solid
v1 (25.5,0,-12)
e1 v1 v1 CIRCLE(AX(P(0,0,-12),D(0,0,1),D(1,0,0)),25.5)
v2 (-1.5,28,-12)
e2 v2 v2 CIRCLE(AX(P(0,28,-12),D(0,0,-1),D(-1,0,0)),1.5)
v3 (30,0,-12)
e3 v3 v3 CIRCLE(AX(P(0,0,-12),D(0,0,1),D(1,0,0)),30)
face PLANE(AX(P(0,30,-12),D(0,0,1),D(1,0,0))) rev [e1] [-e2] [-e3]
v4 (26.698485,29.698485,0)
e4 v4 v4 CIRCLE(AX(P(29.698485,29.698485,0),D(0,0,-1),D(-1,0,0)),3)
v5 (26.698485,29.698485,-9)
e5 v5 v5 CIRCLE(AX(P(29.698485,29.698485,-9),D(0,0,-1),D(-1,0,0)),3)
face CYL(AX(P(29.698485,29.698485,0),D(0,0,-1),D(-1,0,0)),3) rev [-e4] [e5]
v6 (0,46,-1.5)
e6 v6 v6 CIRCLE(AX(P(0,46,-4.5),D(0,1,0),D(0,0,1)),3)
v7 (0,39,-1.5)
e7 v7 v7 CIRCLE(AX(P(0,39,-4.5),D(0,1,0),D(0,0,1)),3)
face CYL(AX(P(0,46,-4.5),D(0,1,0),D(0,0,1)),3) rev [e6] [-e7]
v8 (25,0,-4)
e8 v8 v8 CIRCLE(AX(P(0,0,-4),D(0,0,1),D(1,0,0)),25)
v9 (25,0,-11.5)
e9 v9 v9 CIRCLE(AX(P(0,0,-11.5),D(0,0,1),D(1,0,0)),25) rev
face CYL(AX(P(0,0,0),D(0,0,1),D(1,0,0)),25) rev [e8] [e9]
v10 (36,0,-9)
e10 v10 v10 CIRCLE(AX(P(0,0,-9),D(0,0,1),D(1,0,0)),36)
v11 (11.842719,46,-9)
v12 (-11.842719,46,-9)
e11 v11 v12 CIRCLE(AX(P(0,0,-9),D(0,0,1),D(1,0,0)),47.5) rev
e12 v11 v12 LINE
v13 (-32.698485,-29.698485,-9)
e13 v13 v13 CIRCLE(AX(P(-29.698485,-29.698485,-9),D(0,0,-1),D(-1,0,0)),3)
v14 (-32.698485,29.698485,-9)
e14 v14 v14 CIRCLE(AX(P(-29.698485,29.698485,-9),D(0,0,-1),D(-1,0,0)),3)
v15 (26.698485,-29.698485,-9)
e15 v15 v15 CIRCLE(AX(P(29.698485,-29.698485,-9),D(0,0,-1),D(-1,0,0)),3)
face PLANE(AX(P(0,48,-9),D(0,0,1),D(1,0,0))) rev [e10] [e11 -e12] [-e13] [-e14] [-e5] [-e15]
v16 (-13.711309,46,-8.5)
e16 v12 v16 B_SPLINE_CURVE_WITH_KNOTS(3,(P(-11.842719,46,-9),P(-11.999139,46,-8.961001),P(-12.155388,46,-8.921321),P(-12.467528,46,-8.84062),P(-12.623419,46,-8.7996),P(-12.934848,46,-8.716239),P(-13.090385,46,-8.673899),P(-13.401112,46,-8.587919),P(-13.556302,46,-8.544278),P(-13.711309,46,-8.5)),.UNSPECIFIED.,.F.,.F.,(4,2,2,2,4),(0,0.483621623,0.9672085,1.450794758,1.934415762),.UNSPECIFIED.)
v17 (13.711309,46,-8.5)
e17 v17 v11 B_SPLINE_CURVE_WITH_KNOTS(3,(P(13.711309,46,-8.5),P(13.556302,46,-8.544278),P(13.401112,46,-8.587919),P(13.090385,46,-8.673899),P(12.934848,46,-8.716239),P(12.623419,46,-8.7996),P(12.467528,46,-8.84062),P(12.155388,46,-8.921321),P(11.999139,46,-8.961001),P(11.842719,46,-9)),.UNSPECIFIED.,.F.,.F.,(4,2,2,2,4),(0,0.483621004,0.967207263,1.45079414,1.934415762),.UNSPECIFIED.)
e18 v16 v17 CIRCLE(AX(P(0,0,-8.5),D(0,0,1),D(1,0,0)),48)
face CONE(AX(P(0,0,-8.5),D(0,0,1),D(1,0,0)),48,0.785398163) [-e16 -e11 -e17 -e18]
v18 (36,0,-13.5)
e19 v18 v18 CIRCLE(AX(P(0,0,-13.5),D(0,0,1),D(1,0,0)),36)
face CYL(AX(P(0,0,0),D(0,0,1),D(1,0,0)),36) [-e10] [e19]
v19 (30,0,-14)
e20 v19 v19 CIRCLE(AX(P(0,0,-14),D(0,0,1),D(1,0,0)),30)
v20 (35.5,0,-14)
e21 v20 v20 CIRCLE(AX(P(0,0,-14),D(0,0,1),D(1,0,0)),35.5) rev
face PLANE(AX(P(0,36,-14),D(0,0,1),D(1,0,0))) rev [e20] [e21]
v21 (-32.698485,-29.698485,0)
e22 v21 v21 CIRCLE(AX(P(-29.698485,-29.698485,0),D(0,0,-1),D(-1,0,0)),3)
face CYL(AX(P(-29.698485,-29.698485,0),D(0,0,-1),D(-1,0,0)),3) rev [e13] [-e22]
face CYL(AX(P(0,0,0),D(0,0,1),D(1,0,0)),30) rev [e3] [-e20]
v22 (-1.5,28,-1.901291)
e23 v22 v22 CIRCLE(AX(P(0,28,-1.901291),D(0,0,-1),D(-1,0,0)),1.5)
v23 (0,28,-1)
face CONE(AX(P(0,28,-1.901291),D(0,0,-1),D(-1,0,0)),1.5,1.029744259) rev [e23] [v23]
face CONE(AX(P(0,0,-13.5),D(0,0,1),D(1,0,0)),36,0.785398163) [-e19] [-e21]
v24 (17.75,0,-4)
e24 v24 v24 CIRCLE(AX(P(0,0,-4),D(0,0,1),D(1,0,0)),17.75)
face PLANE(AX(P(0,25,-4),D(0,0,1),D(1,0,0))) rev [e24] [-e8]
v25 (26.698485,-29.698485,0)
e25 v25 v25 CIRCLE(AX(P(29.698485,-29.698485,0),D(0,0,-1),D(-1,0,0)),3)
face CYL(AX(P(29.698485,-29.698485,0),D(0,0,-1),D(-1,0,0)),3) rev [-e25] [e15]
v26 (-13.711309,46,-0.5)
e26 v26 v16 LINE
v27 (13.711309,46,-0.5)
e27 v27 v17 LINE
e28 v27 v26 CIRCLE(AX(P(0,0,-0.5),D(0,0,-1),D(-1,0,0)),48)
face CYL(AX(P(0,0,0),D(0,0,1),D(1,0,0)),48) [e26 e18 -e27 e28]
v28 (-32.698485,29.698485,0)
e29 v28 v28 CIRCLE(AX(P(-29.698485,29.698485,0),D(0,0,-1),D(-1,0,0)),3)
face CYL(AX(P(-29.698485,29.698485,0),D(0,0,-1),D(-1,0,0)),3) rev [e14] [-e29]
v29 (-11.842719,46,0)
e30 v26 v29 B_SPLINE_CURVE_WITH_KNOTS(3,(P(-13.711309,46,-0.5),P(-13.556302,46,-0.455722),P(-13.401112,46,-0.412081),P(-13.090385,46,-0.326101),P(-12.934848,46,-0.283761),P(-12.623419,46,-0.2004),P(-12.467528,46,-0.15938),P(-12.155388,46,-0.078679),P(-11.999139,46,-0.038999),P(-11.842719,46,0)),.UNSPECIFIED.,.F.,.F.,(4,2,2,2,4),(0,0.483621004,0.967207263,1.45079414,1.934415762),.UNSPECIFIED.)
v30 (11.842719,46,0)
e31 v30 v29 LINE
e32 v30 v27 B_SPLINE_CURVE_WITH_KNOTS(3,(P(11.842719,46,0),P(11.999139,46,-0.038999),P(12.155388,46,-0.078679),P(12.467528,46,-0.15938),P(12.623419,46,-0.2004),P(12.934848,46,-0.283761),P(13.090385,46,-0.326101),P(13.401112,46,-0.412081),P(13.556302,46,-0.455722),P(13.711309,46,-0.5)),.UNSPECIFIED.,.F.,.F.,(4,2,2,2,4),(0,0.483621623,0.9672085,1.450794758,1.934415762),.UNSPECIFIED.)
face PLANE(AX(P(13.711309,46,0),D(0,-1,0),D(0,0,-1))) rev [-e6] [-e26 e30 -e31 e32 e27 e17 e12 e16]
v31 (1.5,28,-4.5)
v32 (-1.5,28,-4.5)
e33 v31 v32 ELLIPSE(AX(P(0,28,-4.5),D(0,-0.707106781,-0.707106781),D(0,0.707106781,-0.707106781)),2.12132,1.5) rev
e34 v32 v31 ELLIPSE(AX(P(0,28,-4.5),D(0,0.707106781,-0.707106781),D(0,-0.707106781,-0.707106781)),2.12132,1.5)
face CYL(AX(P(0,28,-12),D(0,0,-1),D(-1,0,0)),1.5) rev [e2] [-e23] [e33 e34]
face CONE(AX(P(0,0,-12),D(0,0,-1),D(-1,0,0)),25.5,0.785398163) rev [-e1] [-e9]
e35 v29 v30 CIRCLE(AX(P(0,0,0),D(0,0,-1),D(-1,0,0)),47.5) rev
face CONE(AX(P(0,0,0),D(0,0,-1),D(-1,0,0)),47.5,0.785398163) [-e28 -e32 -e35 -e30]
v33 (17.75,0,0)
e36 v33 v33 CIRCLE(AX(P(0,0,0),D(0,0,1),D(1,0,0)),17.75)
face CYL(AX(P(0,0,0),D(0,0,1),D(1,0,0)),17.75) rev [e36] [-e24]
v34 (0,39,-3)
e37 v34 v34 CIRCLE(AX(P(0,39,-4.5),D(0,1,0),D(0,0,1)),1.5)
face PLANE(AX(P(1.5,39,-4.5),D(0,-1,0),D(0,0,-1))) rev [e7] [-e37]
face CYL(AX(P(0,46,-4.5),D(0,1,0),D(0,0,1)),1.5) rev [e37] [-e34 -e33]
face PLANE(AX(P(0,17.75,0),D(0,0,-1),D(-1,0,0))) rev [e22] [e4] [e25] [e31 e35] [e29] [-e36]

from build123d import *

# Parameters (mm, degrees)
SKETCH2_R                               = 3
CUT_EXTRUDE1_DEPTH                      = 69.476273263
F_3_0MM_DOWEL_HOLE1_D                   = 3
F_3_0MM_DOWEL_HOLE1_DEPTH               = 10.098709071
F_3_0MM_DOWEL_HOLE1_TIP                 = 0.901290929
CBORE_START                             = 39
CBORE_FOR_M6_HEX_HEAD_BOLT1_OUTLINE_R   = 3
CBORE_FOR_M6_HEX_HEAD_BOLT1_DEPTH       = 7
CBORE_START_2                           = 27.9999999
CBORE_FOR_M6_HEX_HEAD_BOLT1_2_OUTLINE_R = 1.5
CBORE_FOR_M6_HEX_HEAD_BOLT1_2_DEPTH     = 11.0000001
CHAMFER1_SIZE                           = 0.5


# Read off the part's stored shape, not the designer's step: CBORE for M6 Hex Head Bolt1
with BuildPart() as part:
    # Sketch1 → Revolve1 (revolve)
    with BuildSketch(Plane(origin=(0, 0, 0), x_dir=(0, 0, -1), z_dir=(1, 0, 0)), mode=Mode.PRIVATE) as revolve1_sk:
        Polygon((0, 17.75), (0, 48), (9, 48), (9, 36), (14, 36), (14, 30), (12, 30), (12, 25), (4, 25), (4, 17.75), align=None)
    revolve(revolve1_sk.sketch.rotate(Axis((0, 0, 0), (0, 0, -1)), 90), axis=Axis((0, 0, 0), (0, 0, -1)))

    # Sketch2 → Cut-Extrude1 (cut, through all)
    with BuildSketch(Plane(origin=(0, 0, -9), x_dir=(-1, 0, 0), z_dir=(0, 0, -1))):
        with Locations((29.69848481, 29.69848481)):
            Circle(SKETCH2_R)
        with Locations((29.69848481, -29.69848481)):
            Circle(SKETCH2_R)
        with Locations((-29.69848481, -29.69848481)):
            Circle(SKETCH2_R)
        with Locations((-29.69848481, 29.69848481)):
            Circle(SKETCH2_R)
        with BuildLine():
            Line((-13.711309201, 46), (13.711309201, 46))
            ThreePointArc((13.711309201, 46), (0, 48), (-13.711309201, 46))
        make_face()
    extrude(amount=-CUT_EXTRUDE1_DEPTH, mode=Mode.SUBTRACT)

    # Ø3.0mm Dowel Hole1
    with Locations(Plane(origin=(0, 0, -12), x_dir=(-1, 0, 0), z_dir=(0, 0, -1))):
        with Locations((0, 28)):
            Hole(F_3_0MM_DOWEL_HOLE1_D / 2, depth=F_3_0MM_DOWEL_HOLE1_DEPTH)
            with Locations((0, 0, -(F_3_0MM_DOWEL_HOLE1_DEPTH + F_3_0MM_DOWEL_HOLE1_TIP / 2))):  # 118° drill point
                Cone(0, F_3_0MM_DOWEL_HOLE1_D / 2, F_3_0MM_DOWEL_HOLE1_TIP, mode=Mode.SUBTRACT)

    # CBORE for M6 Hex Head Bolt1 outline → CBORE for M6 Hex Head Bolt1 (cut)
    with BuildSketch(Plane(origin=(0, 0, 0), x_dir=(1, 0, 0), z_dir=(0, 1, 0)).offset(CBORE_START)):
        with Locations((0, 4.5)):
            Circle(CBORE_FOR_M6_HEX_HEAD_BOLT1_OUTLINE_R)
    extrude(amount=CBORE_FOR_M6_HEX_HEAD_BOLT1_DEPTH, mode=Mode.SUBTRACT)

    # CBORE for M6 Hex Head Bolt1 2 outline → CBORE for M6 Hex Head Bolt1 2 (cut)
    with BuildSketch(Plane(origin=(0, 0, 0), x_dir=(1, 0, 0), z_dir=(0, 1, 0)).offset(CBORE_START_2)):
        with Locations((0, 4.5)):
            Circle(CBORE_FOR_M6_HEX_HEAD_BOLT1_2_OUTLINE_R)
    extrude(amount=CBORE_FOR_M6_HEX_HEAD_BOLT1_2_DEPTH, mode=Mode.SUBTRACT)

    # Chamfer1
    chamfer1_edges = [part.edges().sort_by_distance(p)[0] for p in [
        (-36, 0, -14),
        (0, -48, -9),
        (0, -48, 0),
        (-25, 0, -12),
    ]]
    chamfer(chamfer1_edges, length=CHAMFER1_SIZE)


solid = part.part
